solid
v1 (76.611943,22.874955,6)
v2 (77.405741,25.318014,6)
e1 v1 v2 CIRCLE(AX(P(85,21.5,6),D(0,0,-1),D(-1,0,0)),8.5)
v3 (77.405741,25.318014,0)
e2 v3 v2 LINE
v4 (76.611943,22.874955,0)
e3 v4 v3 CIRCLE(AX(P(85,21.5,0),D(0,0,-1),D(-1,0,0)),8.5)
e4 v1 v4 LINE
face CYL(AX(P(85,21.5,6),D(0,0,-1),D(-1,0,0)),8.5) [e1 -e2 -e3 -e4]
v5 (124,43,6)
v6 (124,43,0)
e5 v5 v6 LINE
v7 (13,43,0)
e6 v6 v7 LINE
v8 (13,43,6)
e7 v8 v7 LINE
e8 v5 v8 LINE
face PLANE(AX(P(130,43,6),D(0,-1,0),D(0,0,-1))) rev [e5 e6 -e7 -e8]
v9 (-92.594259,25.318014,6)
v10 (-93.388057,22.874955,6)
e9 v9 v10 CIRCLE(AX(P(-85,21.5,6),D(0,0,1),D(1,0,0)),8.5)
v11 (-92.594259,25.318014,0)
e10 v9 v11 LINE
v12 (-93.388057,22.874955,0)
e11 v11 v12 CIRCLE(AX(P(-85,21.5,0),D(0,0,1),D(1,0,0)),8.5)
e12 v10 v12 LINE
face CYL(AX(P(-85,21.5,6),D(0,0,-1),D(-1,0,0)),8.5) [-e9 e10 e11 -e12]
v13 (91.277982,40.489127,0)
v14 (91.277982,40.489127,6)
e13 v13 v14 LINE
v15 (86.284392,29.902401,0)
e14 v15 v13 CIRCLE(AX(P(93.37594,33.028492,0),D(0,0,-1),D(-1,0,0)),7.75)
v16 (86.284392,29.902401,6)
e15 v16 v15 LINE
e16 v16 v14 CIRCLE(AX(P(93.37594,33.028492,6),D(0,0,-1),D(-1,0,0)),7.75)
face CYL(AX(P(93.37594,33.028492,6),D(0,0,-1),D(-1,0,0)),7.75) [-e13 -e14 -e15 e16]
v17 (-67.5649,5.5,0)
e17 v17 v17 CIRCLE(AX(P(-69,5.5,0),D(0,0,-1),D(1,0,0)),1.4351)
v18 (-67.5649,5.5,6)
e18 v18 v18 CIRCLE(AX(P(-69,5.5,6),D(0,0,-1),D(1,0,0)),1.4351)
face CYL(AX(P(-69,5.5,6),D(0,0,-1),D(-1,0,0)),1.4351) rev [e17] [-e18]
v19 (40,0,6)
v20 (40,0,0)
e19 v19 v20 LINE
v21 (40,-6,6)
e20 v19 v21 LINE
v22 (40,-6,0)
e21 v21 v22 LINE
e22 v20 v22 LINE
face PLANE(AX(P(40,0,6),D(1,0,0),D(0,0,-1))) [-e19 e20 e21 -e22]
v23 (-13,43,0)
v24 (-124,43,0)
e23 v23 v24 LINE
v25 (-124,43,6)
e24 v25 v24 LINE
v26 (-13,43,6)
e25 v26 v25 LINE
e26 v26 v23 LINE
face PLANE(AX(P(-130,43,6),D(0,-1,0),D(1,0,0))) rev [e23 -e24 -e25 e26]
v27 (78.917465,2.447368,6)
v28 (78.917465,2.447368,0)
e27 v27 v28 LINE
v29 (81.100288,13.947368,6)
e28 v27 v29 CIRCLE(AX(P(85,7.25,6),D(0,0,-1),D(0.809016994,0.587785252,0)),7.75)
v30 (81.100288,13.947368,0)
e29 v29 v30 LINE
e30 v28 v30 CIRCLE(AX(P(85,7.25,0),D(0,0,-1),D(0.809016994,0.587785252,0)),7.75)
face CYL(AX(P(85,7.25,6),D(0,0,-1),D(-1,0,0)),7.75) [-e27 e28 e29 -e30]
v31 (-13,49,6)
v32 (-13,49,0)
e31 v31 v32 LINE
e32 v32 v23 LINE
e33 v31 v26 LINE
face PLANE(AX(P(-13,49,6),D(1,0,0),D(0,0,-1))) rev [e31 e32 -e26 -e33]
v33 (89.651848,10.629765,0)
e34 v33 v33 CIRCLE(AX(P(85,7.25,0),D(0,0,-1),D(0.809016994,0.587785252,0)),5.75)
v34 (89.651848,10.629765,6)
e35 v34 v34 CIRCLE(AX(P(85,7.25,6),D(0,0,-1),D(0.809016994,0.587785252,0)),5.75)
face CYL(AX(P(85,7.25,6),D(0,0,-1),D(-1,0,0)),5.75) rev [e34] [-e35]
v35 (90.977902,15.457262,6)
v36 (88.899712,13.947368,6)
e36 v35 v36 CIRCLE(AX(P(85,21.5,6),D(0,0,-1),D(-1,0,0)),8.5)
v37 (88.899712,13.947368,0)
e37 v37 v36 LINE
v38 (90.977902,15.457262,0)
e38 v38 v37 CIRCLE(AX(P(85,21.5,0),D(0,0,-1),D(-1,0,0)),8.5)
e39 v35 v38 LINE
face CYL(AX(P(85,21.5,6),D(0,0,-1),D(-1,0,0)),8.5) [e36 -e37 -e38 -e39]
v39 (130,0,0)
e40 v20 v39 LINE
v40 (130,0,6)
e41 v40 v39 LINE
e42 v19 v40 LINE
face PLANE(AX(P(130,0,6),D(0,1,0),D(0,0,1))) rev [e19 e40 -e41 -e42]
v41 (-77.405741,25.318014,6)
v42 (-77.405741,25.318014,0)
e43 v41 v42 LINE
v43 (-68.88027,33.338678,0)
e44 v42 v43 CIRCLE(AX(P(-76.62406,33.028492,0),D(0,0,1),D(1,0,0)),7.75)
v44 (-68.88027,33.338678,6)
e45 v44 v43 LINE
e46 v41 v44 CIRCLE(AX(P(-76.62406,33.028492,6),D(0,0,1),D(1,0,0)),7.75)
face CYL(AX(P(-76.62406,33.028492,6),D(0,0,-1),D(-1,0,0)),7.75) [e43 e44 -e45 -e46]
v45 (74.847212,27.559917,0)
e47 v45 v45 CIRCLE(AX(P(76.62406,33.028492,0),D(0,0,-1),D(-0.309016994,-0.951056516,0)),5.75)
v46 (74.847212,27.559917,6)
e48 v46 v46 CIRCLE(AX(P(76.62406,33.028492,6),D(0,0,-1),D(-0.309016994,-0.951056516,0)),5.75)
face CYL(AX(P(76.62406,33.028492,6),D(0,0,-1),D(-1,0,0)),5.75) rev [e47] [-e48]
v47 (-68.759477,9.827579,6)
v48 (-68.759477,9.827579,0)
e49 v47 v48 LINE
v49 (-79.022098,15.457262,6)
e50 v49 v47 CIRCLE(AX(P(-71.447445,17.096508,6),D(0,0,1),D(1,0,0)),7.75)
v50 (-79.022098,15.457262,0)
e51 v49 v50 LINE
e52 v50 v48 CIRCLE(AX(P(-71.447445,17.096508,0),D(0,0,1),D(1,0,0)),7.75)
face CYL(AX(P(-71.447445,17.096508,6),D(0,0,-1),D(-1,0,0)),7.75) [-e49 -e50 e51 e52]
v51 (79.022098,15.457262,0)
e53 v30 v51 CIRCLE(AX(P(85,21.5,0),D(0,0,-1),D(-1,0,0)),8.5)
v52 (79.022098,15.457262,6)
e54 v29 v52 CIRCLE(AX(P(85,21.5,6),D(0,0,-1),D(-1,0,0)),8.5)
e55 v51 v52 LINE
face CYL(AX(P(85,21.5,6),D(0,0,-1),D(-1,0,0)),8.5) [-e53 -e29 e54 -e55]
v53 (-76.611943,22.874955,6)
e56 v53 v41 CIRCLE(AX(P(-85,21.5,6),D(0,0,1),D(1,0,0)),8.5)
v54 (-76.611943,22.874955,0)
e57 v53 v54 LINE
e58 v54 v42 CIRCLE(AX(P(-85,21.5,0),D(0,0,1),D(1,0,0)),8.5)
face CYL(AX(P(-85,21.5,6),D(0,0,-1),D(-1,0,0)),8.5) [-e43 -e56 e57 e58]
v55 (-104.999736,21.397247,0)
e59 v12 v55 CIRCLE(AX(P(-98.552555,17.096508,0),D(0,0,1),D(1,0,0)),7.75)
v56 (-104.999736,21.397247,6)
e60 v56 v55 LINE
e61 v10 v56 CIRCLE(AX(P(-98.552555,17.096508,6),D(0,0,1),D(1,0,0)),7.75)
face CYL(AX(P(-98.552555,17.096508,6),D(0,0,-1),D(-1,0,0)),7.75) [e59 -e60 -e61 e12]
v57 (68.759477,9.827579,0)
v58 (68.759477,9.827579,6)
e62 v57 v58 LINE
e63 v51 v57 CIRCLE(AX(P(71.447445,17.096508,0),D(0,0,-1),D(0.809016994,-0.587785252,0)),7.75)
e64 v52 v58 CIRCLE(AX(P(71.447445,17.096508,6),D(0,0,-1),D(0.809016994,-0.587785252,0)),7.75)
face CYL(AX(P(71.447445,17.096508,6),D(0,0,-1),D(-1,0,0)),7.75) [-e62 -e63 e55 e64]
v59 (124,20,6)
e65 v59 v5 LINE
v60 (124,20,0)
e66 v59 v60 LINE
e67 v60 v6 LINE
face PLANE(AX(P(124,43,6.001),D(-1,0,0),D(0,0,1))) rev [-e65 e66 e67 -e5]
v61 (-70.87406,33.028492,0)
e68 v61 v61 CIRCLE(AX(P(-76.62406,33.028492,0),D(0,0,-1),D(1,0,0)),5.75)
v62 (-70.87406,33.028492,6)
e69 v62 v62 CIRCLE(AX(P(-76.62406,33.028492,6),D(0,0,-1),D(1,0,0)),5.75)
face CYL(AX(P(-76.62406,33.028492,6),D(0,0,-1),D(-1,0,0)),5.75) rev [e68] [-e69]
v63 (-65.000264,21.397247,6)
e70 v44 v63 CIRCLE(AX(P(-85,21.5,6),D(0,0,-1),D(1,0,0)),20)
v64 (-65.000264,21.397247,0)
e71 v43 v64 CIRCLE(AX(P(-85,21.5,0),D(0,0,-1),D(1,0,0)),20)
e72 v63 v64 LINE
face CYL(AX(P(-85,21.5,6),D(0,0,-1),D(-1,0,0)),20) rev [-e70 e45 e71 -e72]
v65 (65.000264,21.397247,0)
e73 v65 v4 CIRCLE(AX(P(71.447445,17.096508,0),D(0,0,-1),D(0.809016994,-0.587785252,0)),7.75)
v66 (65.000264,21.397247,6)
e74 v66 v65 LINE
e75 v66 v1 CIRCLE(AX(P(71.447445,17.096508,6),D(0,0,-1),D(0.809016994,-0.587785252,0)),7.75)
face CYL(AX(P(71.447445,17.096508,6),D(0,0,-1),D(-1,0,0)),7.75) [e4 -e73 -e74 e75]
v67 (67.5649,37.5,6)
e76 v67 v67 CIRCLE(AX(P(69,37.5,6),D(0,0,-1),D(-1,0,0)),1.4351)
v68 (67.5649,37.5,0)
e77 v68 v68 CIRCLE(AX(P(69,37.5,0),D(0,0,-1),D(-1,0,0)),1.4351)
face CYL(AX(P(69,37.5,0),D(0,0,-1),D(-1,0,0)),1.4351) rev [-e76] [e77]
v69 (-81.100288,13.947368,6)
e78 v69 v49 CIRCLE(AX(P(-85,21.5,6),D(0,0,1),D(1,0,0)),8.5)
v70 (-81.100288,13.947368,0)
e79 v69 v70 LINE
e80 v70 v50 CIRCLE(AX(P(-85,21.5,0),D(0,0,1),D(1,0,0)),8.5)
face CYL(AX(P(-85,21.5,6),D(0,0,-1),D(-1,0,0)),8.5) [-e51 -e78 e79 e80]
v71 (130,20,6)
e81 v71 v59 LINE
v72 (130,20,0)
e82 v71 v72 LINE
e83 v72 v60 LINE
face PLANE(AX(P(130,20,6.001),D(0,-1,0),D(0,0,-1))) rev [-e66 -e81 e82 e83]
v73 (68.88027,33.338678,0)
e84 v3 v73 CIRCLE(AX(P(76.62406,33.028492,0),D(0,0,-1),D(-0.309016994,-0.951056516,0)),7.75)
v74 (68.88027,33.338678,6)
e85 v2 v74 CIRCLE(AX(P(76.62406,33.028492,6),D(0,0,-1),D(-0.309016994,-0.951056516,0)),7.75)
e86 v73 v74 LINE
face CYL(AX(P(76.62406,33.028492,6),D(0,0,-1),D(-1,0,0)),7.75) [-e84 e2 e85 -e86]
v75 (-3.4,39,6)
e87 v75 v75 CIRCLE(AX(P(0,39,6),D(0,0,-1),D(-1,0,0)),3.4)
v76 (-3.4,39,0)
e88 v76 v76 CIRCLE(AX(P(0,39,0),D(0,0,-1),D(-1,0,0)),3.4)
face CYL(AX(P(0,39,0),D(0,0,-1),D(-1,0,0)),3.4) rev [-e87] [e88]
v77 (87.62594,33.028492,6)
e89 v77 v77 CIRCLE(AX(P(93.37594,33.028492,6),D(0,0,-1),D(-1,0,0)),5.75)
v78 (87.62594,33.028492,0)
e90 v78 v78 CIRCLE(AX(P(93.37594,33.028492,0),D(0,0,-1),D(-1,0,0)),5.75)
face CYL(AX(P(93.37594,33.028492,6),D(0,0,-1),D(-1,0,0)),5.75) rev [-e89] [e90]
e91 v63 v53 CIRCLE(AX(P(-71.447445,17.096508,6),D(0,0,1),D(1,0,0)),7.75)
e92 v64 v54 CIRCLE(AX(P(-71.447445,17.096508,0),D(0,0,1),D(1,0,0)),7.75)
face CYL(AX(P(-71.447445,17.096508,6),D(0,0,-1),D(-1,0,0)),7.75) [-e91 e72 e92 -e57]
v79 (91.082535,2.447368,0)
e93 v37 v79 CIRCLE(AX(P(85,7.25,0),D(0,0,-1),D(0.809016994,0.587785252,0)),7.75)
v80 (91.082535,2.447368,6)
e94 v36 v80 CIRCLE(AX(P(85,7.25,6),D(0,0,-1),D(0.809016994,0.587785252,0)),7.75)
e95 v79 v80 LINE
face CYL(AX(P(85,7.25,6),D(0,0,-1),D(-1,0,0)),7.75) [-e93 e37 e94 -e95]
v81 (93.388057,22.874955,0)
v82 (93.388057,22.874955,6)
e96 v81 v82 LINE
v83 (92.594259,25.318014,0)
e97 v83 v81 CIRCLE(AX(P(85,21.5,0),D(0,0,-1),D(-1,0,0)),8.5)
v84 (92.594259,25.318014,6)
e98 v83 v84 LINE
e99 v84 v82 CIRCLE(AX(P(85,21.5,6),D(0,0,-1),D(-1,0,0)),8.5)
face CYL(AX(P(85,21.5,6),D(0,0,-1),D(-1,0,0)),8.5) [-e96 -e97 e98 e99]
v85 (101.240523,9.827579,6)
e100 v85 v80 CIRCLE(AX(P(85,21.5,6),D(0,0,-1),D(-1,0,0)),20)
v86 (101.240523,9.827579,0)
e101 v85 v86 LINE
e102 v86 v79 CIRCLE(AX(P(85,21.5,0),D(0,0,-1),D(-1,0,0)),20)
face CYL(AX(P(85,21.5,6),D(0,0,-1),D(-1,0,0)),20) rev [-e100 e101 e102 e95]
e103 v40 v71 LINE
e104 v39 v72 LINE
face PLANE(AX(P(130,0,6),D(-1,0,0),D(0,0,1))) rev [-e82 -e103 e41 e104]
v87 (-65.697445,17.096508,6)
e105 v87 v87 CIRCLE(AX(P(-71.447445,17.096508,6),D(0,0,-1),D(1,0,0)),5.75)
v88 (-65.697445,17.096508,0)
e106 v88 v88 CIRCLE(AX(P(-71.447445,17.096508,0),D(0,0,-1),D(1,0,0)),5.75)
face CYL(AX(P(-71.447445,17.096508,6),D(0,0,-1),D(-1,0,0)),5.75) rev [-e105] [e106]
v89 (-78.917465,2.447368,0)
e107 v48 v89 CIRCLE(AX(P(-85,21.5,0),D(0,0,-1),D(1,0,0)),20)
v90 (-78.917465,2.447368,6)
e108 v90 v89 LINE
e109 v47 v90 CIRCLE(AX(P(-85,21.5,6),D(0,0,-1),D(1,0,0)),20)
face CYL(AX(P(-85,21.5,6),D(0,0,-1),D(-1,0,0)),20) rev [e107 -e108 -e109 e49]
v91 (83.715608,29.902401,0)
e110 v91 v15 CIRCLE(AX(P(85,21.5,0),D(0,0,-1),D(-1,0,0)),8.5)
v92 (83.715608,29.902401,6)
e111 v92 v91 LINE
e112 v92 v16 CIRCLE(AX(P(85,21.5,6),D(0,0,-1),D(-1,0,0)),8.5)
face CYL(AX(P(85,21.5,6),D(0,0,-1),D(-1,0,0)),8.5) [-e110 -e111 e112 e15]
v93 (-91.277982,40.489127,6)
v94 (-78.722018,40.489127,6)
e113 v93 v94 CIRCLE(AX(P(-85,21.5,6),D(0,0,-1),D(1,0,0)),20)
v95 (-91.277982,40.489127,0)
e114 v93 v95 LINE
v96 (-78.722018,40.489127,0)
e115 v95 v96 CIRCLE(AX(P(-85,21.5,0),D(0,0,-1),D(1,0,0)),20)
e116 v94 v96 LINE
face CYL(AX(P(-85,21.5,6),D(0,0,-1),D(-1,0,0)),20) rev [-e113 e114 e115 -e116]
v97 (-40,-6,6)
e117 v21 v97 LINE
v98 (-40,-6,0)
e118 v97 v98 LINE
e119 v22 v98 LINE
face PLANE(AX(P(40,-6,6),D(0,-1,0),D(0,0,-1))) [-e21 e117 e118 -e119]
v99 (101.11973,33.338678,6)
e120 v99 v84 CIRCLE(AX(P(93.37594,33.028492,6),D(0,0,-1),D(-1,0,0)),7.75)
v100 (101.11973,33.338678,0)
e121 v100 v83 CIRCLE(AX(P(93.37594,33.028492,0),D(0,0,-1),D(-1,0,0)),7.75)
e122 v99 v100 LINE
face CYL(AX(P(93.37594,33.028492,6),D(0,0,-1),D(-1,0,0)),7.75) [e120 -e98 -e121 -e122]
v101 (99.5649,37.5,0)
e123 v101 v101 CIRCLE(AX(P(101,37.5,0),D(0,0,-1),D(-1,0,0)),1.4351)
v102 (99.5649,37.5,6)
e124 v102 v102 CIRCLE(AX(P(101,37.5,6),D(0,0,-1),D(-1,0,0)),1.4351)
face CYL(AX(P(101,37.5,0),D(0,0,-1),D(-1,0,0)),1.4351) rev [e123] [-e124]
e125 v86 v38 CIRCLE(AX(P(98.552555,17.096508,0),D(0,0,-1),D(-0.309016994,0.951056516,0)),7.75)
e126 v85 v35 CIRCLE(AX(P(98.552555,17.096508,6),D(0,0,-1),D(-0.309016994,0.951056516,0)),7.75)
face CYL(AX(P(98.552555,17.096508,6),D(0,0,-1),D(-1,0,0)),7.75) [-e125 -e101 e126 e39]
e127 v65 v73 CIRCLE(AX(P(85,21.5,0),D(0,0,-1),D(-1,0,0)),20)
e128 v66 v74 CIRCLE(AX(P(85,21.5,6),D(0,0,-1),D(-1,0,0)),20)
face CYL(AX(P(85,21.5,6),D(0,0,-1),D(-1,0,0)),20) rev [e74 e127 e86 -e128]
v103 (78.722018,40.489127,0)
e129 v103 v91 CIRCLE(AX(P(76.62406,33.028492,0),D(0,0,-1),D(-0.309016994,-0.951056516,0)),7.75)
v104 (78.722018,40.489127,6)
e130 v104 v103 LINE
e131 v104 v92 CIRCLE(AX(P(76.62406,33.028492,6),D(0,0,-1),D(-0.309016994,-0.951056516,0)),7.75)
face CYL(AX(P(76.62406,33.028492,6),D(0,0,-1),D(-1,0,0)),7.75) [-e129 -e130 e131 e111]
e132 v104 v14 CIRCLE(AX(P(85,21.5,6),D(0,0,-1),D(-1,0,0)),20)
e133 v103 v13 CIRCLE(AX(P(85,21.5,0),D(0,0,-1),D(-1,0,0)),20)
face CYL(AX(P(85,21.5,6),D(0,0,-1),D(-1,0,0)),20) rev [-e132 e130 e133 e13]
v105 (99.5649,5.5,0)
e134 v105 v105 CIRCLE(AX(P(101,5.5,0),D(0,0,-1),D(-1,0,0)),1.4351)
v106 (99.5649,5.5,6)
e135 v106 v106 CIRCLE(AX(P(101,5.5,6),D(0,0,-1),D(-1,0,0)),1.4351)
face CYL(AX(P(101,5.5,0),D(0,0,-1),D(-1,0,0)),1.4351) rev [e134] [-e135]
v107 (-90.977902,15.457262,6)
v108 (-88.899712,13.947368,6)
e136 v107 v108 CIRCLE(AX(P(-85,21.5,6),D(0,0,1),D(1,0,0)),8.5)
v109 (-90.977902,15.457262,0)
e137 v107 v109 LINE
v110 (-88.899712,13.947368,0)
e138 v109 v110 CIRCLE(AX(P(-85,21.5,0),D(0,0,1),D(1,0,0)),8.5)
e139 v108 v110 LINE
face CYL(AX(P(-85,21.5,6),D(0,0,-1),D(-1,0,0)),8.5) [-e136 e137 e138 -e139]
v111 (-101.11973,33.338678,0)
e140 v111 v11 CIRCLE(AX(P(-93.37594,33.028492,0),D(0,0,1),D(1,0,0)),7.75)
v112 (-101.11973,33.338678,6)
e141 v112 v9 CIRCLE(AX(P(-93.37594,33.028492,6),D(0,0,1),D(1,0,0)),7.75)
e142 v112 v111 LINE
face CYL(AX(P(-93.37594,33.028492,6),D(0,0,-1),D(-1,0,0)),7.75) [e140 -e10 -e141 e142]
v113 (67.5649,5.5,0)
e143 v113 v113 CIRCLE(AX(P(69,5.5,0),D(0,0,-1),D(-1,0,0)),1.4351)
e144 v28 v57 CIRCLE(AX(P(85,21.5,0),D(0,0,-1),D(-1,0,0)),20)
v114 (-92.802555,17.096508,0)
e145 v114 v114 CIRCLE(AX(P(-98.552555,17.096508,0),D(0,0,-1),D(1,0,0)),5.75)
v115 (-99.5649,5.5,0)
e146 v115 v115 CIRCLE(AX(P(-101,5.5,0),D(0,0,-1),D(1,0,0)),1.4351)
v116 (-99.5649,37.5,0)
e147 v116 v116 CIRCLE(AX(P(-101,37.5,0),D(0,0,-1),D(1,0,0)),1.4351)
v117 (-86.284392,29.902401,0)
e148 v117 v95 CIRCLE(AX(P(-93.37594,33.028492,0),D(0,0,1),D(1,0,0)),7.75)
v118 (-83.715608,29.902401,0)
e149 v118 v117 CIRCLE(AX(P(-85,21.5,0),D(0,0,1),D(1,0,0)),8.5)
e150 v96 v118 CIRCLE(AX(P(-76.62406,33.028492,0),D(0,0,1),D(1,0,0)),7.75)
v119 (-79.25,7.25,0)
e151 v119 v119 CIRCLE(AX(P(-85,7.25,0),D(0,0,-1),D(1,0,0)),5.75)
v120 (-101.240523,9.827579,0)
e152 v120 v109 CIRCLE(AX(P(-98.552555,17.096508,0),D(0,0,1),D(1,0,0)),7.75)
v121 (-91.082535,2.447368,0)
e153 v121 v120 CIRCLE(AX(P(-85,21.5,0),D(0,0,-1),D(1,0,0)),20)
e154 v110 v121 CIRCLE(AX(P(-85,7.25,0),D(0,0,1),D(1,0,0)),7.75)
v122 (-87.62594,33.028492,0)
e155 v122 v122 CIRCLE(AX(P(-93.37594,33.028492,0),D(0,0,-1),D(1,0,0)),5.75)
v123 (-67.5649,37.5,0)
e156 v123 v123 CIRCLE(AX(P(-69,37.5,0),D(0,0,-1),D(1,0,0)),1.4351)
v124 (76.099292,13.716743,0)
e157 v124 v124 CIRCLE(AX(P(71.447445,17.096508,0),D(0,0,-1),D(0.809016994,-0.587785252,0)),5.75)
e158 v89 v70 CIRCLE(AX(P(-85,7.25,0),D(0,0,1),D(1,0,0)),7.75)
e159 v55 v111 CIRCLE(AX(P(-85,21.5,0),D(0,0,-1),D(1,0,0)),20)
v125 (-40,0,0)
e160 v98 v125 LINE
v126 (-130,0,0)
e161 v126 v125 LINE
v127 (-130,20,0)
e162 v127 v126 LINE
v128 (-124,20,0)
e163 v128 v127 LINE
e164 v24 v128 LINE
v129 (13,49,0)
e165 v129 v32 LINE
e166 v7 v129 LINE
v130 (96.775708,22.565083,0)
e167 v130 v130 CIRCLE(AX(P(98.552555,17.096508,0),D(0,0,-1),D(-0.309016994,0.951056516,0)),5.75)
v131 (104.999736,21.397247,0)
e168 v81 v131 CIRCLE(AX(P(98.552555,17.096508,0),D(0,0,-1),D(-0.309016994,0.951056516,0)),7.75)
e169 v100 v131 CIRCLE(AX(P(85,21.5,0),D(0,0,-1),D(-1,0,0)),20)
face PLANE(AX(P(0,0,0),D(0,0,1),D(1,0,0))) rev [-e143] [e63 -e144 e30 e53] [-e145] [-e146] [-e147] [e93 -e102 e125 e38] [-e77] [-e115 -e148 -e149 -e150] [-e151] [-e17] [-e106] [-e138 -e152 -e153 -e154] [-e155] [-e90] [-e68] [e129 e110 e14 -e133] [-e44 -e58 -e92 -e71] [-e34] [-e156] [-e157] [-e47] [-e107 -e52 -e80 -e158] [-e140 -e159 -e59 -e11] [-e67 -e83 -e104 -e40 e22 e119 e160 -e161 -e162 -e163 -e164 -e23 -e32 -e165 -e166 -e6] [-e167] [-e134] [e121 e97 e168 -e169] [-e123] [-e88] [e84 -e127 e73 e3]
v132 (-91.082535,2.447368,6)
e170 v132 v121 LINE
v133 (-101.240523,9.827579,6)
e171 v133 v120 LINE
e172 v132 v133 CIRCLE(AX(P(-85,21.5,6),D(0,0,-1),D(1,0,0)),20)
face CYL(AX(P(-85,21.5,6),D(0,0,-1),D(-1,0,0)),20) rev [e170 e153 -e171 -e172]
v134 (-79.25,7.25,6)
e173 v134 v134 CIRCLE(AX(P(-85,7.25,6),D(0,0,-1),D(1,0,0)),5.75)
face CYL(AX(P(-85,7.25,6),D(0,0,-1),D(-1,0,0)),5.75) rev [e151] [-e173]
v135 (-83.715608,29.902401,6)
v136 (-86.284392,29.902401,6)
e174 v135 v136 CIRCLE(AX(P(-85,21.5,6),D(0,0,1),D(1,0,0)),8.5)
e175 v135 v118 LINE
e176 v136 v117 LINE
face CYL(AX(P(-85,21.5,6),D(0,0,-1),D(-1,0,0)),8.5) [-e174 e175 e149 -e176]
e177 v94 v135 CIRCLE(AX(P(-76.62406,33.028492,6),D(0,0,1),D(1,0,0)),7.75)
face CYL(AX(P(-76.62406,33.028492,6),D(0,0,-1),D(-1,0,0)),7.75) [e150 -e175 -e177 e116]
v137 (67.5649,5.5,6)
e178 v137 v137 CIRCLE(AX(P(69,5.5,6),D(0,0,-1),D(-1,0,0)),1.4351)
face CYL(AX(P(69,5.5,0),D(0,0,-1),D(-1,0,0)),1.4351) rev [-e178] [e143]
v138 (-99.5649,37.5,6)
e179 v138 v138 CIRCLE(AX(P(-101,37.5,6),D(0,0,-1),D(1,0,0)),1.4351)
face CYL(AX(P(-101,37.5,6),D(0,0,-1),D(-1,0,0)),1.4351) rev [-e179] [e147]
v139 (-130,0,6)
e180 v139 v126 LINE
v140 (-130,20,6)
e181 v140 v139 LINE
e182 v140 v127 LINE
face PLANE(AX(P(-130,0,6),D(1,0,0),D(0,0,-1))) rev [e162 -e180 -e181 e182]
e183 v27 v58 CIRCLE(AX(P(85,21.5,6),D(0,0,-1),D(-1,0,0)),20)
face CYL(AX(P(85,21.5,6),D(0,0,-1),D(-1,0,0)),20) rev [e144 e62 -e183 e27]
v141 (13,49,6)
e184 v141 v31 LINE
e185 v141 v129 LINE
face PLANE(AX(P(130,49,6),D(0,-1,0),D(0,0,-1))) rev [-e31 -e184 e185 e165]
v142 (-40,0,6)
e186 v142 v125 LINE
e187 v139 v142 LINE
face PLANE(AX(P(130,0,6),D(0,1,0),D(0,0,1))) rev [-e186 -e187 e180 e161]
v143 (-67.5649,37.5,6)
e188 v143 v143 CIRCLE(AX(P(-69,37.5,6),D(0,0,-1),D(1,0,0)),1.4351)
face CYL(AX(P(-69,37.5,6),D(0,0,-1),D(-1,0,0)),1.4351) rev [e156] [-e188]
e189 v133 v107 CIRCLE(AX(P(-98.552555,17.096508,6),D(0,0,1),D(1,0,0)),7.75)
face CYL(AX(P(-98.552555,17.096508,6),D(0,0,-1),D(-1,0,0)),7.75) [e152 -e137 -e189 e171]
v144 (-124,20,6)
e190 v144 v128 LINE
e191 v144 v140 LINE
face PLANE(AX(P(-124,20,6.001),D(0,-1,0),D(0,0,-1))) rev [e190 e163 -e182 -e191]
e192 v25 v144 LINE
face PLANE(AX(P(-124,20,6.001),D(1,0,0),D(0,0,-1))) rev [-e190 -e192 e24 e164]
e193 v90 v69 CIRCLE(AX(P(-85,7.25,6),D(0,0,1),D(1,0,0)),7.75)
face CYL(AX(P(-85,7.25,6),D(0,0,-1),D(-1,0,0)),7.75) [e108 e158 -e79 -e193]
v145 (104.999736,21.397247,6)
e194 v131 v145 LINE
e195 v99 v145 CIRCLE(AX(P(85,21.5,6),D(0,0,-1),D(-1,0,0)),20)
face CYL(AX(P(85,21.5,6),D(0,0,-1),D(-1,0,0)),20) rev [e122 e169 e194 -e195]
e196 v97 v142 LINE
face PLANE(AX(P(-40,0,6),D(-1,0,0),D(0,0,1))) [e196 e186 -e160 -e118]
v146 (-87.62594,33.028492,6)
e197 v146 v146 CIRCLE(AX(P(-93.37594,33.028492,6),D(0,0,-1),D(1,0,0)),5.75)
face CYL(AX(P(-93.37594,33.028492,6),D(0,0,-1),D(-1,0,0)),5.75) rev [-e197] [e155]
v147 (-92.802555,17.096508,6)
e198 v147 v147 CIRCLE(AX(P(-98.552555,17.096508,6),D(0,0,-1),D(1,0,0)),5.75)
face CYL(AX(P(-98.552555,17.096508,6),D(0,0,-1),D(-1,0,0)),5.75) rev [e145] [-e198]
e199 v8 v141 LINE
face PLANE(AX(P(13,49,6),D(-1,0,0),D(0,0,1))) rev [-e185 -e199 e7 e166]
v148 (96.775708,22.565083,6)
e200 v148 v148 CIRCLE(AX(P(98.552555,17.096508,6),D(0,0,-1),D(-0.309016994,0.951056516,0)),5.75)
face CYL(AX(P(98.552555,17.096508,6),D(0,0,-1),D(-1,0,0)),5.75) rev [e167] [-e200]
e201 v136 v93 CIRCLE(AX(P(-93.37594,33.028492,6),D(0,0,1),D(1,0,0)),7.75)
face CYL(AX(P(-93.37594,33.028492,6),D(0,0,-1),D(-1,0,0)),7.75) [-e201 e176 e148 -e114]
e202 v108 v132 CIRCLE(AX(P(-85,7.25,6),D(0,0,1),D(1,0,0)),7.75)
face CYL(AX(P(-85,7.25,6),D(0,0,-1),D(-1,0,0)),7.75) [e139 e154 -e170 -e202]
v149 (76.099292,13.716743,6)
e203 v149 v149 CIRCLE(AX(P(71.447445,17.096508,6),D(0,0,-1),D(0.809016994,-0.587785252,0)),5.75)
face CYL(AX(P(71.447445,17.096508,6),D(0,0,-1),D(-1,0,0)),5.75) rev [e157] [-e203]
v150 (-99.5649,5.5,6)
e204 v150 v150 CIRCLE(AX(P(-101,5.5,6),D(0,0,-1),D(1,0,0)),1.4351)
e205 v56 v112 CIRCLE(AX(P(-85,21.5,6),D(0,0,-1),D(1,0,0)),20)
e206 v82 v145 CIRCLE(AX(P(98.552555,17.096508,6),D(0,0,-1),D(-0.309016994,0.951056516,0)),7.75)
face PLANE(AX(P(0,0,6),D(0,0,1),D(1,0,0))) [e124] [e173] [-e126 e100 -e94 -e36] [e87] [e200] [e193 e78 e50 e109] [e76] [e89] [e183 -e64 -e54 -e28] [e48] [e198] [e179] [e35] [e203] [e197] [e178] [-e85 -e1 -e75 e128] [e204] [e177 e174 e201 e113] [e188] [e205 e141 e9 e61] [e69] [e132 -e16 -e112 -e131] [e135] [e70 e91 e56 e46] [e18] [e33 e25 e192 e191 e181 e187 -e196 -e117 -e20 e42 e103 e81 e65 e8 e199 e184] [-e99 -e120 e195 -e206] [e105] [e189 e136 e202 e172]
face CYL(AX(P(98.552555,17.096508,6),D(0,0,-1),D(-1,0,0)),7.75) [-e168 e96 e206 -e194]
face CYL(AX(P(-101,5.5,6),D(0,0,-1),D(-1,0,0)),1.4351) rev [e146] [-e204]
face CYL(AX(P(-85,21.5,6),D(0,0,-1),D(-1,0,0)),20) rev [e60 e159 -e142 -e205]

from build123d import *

# Parameters (mm, degrees)
SKETCH1_W                      = 260
SKETCH1_H                      = 49
BOSS_EXTRUDE1_DEPTH            = 6
SKETCH2_W                      = 117
SKETCH2_H                      = 6
CUT_EXTRUDE1_DEPTH             = 140.057542046
SKETCH5_W                      = 3.4
SKETCH5_H                      = 6
CUT_EXTRUDE2_REACH             = 141.058
SKETCH6_W                      = 6
SKETCH6_H                      = 23
SKETCH7_W                      = 80
SKETCH7_H                      = 6
BOSS_EXTRUDE2_DEPTH            = 6
SKETCH8_R                      = 20
SKETCH8_R_2                    = 8.5
CUT_EXTRUDE3_DEPTH             = 6
SKETCH9_R                      = 5.75
BOSS_EXTRUDE3_DEPTH            = 6
CIRPATTERN1_COUNT              = 5
SKETCH11_W                     = 1.4351
SKETCH11_H                     = 6
F_6_40_TAPPED_HOLE1_AT_2_COUNT = 2
F_6_40_TAPPED_HOLE1_AT_2_PITCH = 32
F_6_40_TAPPED_HOLE1_AT_3_COUNT = 2
F_6_40_TAPPED_HOLE1_AT_3_PITCH = 45.254833996
F_6_40_TAPPED_HOLE1_AT_4_COUNT = 2
F_6_40_TAPPED_HOLE1_AT_4_PITCH = 32
SKETCH12_R                     = 1.4351
SKETCH12_R_2                   = 3.4
SKETCH12_R_3                   = 5.75
CUT_EXTRUDE4_DEPTH             = 6


with BuildPart() as part:
    # Sketch1 → Boss-Extrude1 (new body)
    with BuildSketch(Plane.XY):
        with Locations((0, 24.5)):
            Rectangle(SKETCH1_W, SKETCH1_H)
    extrude(amount=BOSS_EXTRUDE1_DEPTH)

    # Sketch2 → Cut-Extrude1 (cut, through all)
    with BuildSketch(Plane(origin=(0, 0, 0), x_dir=(-1, 0, 0), z_dir=(0, 0, -1))):
        with Locations((-71.5, 46)):
            Rectangle(SKETCH2_W, SKETCH2_H)
        with Locations((71.5, 46)):
            Rectangle(SKETCH2_W, SKETCH2_H)
    extrude(amount=-CUT_EXTRUDE1_DEPTH, mode=Mode.SUBTRACT)

    # Sketch5 → M8x1.25 Tapped Hole1 (revolve, cut)
    with BuildSketch(Plane(origin=(0, 39, 0), x_dir=(0, 1, 0), z_dir=(1, 0, 0))):
        with Locations((1.7, 3)):
            Rectangle(SKETCH5_W, SKETCH5_H)
    revolve(axis=Axis((0, 39, -6.35), (0, 0, 1)), mode=Mode.SUBTRACT)

    # Sketch6 → Cut-Extrude2 (cut, up to next)
    with BuildSketch(Plane(origin=(0, 0, 0), x_dir=(-1, 0, 0), z_dir=(0, 0, -1)), mode=Mode.PRIVATE) as cut_extrude2_sk1:
        with Locations((-127, 31.5)):
            Rectangle(SKETCH6_W, SKETCH6_H)
    cut_extrude2_tool1 = extrude(cut_extrude2_sk1.sketch, amount=-CUT_EXTRUDE2_REACH, mode=Mode.PRIVATE) & part.part
    # Sketch6 → Cut-Extrude2 (cut, up to next)
    with BuildSketch(Plane(origin=(0, 0, 0), x_dir=(-1, 0, 0), z_dir=(0, 0, -1)), mode=Mode.PRIVATE) as cut_extrude2_sk2:
        with Locations((127, 31.5)):
            Rectangle(SKETCH6_W, SKETCH6_H)
    cut_extrude2_tool2 = extrude(cut_extrude2_sk2.sketch, amount=-CUT_EXTRUDE2_REACH, mode=Mode.PRIVATE) & part.part
    add(cut_extrude2_tool1.solids().sort_by_distance((127, 31.5, 0))[0], mode=Mode.SUBTRACT)
    add(cut_extrude2_tool2.solids().sort_by_distance((-127, 31.5, 0))[0], mode=Mode.SUBTRACT)

    # Sketch7 → Boss-Extrude2 (add)
    with BuildSketch(Plane(origin=(0, 0, 0), x_dir=(-1, 0, 0), z_dir=(0, 0, -1))):
        with Locations((0, -3)):
            Rectangle(SKETCH7_W, SKETCH7_H)
    extrude(amount=-BOSS_EXTRUDE2_DEPTH)

    # Sketch8 → Cut-Extrude3 (cut)
    with BuildSketch(Plane(origin=(0, 0, 0), x_dir=(-1, 0, 0), z_dir=(0, 0, -1))):
        with Locations((-85, 21.5)):
            Circle(SKETCH8_R)
        with Locations((-85, 21.5)):
            Circle(SKETCH8_R_2, mode=Mode.SUBTRACT)
    extrude(amount=-CUT_EXTRUDE3_DEPTH, mode=Mode.SUBTRACT)


with BuildPart() as cut_extrude3_piece_1:
    # of the separate pieces the step leaves, piece 1, a body of its own (cut_extrude3_pieces)
    add(part.part.solids().sort_by_distance((130, 0, 0))[0])



with BuildPart() as cut_extrude3_piece_2:
    # of the separate pieces the step leaves, piece 2, a body of its own (cut_extrude3_pieces)
    add(part.part.solids().sort_by_distance((76.5, 21.5, 0))[0])


with BuildPart() as cut_extrude3_piece_1_1:
    add(cut_extrude3_piece_1.part)

    add(cut_extrude3_piece_2.part)  # Boss-Extrude3 merges Cut-Extrude3 piece 2
    # Sketch9 → Boss-Extrude3 (add)
    with BuildSketch(Plane(origin=(0, 0, 0), x_dir=(-1, 0, 0), z_dir=(0, 0, -1))):
        with BuildLine():
            ThreePointArc((-100.761482737, 35.377163324), (-88.82060414, 26.758610463), (-93.327400585, 40.778340164))
            ThreePointArc((-93.327400585, 40.778340164), (-97.343490298, 38.489356882), (-100.761482737, 35.377163324))
        make_face()
        with Locations((-93.375939845, 33.02849217)):
            Circle(SKETCH9_R, mode=Mode.SUBTRACT)
    boss_extrude3 = extrude(amount=-BOSS_EXTRUDE3_DEPTH)

    # CirPattern1: Boss-Extrude3 ×5 about axis
    cirpattern1_axis = Axis((85, 21.5, 0), (0, 0, -1))
    for i in range(1, CIRPATTERN1_COUNT):
        add(boss_extrude3.rotate(cirpattern1_axis, i * 360 / CIRPATTERN1_COUNT))

    # Sketch11 → #6-40 Tapped Hole1 (revolve, cut)
    with BuildSketch(Plane(origin=(101, 37.5, 0), x_dir=(0, 1, 0), z_dir=(1, 0, 0))):
        with Locations((0.71755, 3)):
            Rectangle(SKETCH11_W, SKETCH11_H)
    f_6_40_tapped_hole1 = revolve(axis=Axis((101, 37.5, -6.35), (0, 0, 1)), mode=Mode.SUBTRACT)

    # #6-40 Tapped Hole1 at 2: #6-40 Tapped Hole1 ×2
    with Locations(*[(-i * F_6_40_TAPPED_HOLE1_AT_2_PITCH, 0, 0) for i in range(1, F_6_40_TAPPED_HOLE1_AT_2_COUNT)]):
        add(f_6_40_tapped_hole1, mode=Mode.SUBTRACT)

    # #6-40 Tapped Hole1 at 3: #6-40 Tapped Hole1 ×2
    with Locations(*[Vector(-0.7071067811865476, -0.7071067811865476, 0) * (i * F_6_40_TAPPED_HOLE1_AT_3_PITCH) for i in range(1, F_6_40_TAPPED_HOLE1_AT_3_COUNT)]):
        add(f_6_40_tapped_hole1, mode=Mode.SUBTRACT)

    # #6-40 Tapped Hole1 at 4: #6-40 Tapped Hole1 ×2
    with Locations(*[(0, -i * F_6_40_TAPPED_HOLE1_AT_4_PITCH, 0) for i in range(1, F_6_40_TAPPED_HOLE1_AT_4_COUNT)]):
        add(f_6_40_tapped_hole1, mode=Mode.SUBTRACT)

    # Sketch12 → Cut-Extrude4 (cut)
    with BuildSketch(Plane(origin=(0, 0, 0), x_dir=(-1, 0, 0), z_dir=(0, 0, -1))):
        with Locations(Location((101, 37.5, 0), (0, 0, 180))):
            Circle(SKETCH12_R)
        with Locations((0, 39)):
            Circle(SKETCH12_R_2)
        with Locations((-93.375939845, 33.02849217)):
            Circle(SKETCH12_R_3)
        with Locations(Location((-76.624060155, 33.02849217, 0), (0, 0, 288))):
            Circle(SKETCH12_R_3)
        with Locations(Location((-71.447444643, 17.09650783, 0), (0, 0, 216))):
            Circle(SKETCH12_R_3)
        with Locations(Location((-85, 7.25, 0), (0, 0, 144))):
            Circle(SKETCH12_R_3)
        with Locations(Location((-98.552555357, 17.09650783, 0), (0, 0, 72))):
            Circle(SKETCH12_R_3)
        with Locations((-101, 5.5)):
            Circle(SKETCH12_R)
        with Locations((-69, 5.5)):
            Circle(SKETCH12_R)
        with Locations((-69, 37.5)):
            Circle(SKETCH12_R)
        with Locations((-101, 37.5)):
            Circle(SKETCH12_R)
        with Locations(Location((69, 37.5, 0), (0, 0, 180))):
            Circle(SKETCH12_R)
        with Locations(Location((69, 5.5, 0), (0, 0, 180))):
            Circle(SKETCH12_R)
        with Locations(Location((101, 5.5, 0), (0, 0, 180))):
            Circle(SKETCH12_R)
        with Locations(Location((98.552555357, 17.09650783, 0), (0, 0, 180))):
            Circle(SKETCH12_R_3)
        with Locations(Location((85, 7.25, 0), (0, 0, 180))):
            Circle(SKETCH12_R_3)
        with Locations(Location((71.447444643, 17.09650783, 0), (0, 0, 180))):
            Circle(SKETCH12_R_3)
        with Locations(Location((76.624060155, 33.02849217, 0), (0, 0, 180))):
            Circle(SKETCH12_R_3)
        with Locations(Location((93.375939845, 33.02849217, 0), (0, 0, 180))):
            Circle(SKETCH12_R_3)
        with BuildLine():
            ThreePointArc((-78.722018184, 40.489127003), (-83.633443041, 36.334706252), (-83.715608088, 29.902400694))
            ThreePointArc((-83.715608088, 29.902400694), (-85, 30), (-86.284391912, 29.902400694))
            ThreePointArc((-86.284391912, 29.902400694), (-86.366556959, 36.334706252), (-91.277981816, 40.489127003))
            ThreePointArc((-91.277981816, 40.489127003), (-85, 41.5), (-78.722018184, 40.489127003))
        make_face()
        with BuildLine():
            ThreePointArc((-65.000263954, 21.397247437), (-65.978869674, 27.680339887), (-68.880270097, 33.338678467))
            ThreePointArc((-68.880270097, 33.338678467), (-71.313645276, 27.383849239), (-77.405740996, 25.318013906))
            ThreePointArc((-77.405740996, 25.318013906), (-76.916019611, 24.126644452), (-76.611943139, 22.87495531))
            ThreePointArc((-76.611943139, 22.87495531), (-70.469066627, 24.784503438), (-65.000263954, 21.397247437))
        make_face()
        with BuildLine():
            ThreePointArc((-78.917465173, 2.447368421), (-73.244294954, 5.319660113), (-68.759477215, 9.827578672))
            ThreePointArc((-68.759477215, 9.827578672), (-75.174810639, 10.301712562), (-79.022097904, 15.45726167))
            ThreePointArc((-79.022097904, 15.45726167), (-80.003825356, 14.623355548), (-81.100287673, 13.947368421))
            ThreePointArc((-81.100287673, 13.947368421), (-77.385946247, 8.695228508), (-78.917465173, 2.447368421))
        make_face()
        with BuildLine():
            ThreePointArc((-93.388056861, 22.87495531), (-99.530933373, 24.784503438), (-104.999736046, 21.397247437))
            ThreePointArc((-104.999736046, 21.397247437), (-104.021130326, 27.680339887), (-101.119729903, 33.338678467))
            ThreePointArc((-101.119729903, 33.338678467), (-98.686354724, 27.383849239), (-92.594259004, 25.318013906))
            ThreePointArc((-92.594259004, 25.318013906), (-93.083980389, 24.126644452), (-93.388056861, 22.87495531))
        make_face()
        with BuildLine():
            ThreePointArc((-101.240522785, 9.827578672), (-96.755705046, 5.319660113), (-91.082534827, 2.447368421))
            ThreePointArc((-91.082534827, 2.447368421), (-92.614053753, 8.695228508), (-88.899712327, 13.947368421))
            ThreePointArc((-88.899712327, 13.947368421), (-89.996174644, 14.623355548), (-90.977902096, 15.45726167))
            ThreePointArc((-90.977902096, 15.45726167), (-94.825189361, 10.301712562), (-101.240522785, 9.827578672))
        make_face()
        with BuildLine():
            ThreePointArc((88.899712327, 13.947368421), (92.614053753, 8.695228508), (91.082534827, 2.447368421))
            ThreePointArc((91.082534827, 2.447368421), (96.755705046, 5.319660113), (101.240522785, 9.827578672))
            ThreePointArc((101.240522785, 9.827578672), (94.825189361, 10.301712562), (90.977902096, 15.45726167))
            ThreePointArc((90.977902096, 15.45726167), (89.996174644, 14.623355548), (88.899712327, 13.947368421))
        make_face()
        with BuildLine():
            ThreePointArc((92.594259004, 25.318013906), (93.083980389, 24.126644452), (93.388056861, 22.87495531))
            ThreePointArc((93.388056861, 22.87495531), (99.530933373, 24.784503438), (104.999736046, 21.397247437))
            ThreePointArc((104.999736046, 21.397247437), (104.021130326, 27.680339887), (101.119729903, 33.338678467))
            ThreePointArc((101.119729903, 33.338678467), (98.686354724, 27.383849239), (92.594259004, 25.318013906))
        make_face()
        with BuildLine():
            ThreePointArc((79.022097904, 15.45726167), (75.174810639, 10.301712562), (68.759477215, 9.827578672))
            ThreePointArc((68.759477215, 9.827578672), (73.244294954, 5.319660113), (78.917465173, 2.447368421))
            ThreePointArc((78.917465173, 2.447368421), (77.385946247, 8.695228508), (81.100287673, 13.947368421))
            ThreePointArc((81.100287673, 13.947368421), (80.003825356, 14.623355548), (79.022097904, 15.45726167))
        make_face()
        with BuildLine():
            ThreePointArc((77.405740996, 25.318013906), (71.313645276, 27.383849239), (68.880270097, 33.338678467))
            ThreePointArc((68.880270097, 33.338678467), (65.978869674, 27.680339887), (65.000263954, 21.397247437))
            ThreePointArc((65.000263954, 21.397247437), (70.469066627, 24.784503438), (76.611943139, 22.87495531))
            ThreePointArc((76.611943139, 22.87495531), (76.916019611, 24.126644452), (77.405740996, 25.318013906))
        make_face()
        with BuildLine():
            ThreePointArc((78.722018184, 40.489127003), (85, 41.5), (91.277981816, 40.489127003))
            ThreePointArc((91.277981816, 40.489127003), (86.366556959, 36.334706252), (86.284391912, 29.902400694))
            ThreePointArc((86.284391912, 29.902400694), (85, 30), (83.715608088, 29.902400694))
            ThreePointArc((83.715608088, 29.902400694), (83.633443041, 36.334706252), (78.722018184, 40.489127003))
        make_face()
    extrude(amount=-CUT_EXTRUDE4_DEPTH, mode=Mode.SUBTRACT)


solid = cut_extrude3_piece_1_1.part
